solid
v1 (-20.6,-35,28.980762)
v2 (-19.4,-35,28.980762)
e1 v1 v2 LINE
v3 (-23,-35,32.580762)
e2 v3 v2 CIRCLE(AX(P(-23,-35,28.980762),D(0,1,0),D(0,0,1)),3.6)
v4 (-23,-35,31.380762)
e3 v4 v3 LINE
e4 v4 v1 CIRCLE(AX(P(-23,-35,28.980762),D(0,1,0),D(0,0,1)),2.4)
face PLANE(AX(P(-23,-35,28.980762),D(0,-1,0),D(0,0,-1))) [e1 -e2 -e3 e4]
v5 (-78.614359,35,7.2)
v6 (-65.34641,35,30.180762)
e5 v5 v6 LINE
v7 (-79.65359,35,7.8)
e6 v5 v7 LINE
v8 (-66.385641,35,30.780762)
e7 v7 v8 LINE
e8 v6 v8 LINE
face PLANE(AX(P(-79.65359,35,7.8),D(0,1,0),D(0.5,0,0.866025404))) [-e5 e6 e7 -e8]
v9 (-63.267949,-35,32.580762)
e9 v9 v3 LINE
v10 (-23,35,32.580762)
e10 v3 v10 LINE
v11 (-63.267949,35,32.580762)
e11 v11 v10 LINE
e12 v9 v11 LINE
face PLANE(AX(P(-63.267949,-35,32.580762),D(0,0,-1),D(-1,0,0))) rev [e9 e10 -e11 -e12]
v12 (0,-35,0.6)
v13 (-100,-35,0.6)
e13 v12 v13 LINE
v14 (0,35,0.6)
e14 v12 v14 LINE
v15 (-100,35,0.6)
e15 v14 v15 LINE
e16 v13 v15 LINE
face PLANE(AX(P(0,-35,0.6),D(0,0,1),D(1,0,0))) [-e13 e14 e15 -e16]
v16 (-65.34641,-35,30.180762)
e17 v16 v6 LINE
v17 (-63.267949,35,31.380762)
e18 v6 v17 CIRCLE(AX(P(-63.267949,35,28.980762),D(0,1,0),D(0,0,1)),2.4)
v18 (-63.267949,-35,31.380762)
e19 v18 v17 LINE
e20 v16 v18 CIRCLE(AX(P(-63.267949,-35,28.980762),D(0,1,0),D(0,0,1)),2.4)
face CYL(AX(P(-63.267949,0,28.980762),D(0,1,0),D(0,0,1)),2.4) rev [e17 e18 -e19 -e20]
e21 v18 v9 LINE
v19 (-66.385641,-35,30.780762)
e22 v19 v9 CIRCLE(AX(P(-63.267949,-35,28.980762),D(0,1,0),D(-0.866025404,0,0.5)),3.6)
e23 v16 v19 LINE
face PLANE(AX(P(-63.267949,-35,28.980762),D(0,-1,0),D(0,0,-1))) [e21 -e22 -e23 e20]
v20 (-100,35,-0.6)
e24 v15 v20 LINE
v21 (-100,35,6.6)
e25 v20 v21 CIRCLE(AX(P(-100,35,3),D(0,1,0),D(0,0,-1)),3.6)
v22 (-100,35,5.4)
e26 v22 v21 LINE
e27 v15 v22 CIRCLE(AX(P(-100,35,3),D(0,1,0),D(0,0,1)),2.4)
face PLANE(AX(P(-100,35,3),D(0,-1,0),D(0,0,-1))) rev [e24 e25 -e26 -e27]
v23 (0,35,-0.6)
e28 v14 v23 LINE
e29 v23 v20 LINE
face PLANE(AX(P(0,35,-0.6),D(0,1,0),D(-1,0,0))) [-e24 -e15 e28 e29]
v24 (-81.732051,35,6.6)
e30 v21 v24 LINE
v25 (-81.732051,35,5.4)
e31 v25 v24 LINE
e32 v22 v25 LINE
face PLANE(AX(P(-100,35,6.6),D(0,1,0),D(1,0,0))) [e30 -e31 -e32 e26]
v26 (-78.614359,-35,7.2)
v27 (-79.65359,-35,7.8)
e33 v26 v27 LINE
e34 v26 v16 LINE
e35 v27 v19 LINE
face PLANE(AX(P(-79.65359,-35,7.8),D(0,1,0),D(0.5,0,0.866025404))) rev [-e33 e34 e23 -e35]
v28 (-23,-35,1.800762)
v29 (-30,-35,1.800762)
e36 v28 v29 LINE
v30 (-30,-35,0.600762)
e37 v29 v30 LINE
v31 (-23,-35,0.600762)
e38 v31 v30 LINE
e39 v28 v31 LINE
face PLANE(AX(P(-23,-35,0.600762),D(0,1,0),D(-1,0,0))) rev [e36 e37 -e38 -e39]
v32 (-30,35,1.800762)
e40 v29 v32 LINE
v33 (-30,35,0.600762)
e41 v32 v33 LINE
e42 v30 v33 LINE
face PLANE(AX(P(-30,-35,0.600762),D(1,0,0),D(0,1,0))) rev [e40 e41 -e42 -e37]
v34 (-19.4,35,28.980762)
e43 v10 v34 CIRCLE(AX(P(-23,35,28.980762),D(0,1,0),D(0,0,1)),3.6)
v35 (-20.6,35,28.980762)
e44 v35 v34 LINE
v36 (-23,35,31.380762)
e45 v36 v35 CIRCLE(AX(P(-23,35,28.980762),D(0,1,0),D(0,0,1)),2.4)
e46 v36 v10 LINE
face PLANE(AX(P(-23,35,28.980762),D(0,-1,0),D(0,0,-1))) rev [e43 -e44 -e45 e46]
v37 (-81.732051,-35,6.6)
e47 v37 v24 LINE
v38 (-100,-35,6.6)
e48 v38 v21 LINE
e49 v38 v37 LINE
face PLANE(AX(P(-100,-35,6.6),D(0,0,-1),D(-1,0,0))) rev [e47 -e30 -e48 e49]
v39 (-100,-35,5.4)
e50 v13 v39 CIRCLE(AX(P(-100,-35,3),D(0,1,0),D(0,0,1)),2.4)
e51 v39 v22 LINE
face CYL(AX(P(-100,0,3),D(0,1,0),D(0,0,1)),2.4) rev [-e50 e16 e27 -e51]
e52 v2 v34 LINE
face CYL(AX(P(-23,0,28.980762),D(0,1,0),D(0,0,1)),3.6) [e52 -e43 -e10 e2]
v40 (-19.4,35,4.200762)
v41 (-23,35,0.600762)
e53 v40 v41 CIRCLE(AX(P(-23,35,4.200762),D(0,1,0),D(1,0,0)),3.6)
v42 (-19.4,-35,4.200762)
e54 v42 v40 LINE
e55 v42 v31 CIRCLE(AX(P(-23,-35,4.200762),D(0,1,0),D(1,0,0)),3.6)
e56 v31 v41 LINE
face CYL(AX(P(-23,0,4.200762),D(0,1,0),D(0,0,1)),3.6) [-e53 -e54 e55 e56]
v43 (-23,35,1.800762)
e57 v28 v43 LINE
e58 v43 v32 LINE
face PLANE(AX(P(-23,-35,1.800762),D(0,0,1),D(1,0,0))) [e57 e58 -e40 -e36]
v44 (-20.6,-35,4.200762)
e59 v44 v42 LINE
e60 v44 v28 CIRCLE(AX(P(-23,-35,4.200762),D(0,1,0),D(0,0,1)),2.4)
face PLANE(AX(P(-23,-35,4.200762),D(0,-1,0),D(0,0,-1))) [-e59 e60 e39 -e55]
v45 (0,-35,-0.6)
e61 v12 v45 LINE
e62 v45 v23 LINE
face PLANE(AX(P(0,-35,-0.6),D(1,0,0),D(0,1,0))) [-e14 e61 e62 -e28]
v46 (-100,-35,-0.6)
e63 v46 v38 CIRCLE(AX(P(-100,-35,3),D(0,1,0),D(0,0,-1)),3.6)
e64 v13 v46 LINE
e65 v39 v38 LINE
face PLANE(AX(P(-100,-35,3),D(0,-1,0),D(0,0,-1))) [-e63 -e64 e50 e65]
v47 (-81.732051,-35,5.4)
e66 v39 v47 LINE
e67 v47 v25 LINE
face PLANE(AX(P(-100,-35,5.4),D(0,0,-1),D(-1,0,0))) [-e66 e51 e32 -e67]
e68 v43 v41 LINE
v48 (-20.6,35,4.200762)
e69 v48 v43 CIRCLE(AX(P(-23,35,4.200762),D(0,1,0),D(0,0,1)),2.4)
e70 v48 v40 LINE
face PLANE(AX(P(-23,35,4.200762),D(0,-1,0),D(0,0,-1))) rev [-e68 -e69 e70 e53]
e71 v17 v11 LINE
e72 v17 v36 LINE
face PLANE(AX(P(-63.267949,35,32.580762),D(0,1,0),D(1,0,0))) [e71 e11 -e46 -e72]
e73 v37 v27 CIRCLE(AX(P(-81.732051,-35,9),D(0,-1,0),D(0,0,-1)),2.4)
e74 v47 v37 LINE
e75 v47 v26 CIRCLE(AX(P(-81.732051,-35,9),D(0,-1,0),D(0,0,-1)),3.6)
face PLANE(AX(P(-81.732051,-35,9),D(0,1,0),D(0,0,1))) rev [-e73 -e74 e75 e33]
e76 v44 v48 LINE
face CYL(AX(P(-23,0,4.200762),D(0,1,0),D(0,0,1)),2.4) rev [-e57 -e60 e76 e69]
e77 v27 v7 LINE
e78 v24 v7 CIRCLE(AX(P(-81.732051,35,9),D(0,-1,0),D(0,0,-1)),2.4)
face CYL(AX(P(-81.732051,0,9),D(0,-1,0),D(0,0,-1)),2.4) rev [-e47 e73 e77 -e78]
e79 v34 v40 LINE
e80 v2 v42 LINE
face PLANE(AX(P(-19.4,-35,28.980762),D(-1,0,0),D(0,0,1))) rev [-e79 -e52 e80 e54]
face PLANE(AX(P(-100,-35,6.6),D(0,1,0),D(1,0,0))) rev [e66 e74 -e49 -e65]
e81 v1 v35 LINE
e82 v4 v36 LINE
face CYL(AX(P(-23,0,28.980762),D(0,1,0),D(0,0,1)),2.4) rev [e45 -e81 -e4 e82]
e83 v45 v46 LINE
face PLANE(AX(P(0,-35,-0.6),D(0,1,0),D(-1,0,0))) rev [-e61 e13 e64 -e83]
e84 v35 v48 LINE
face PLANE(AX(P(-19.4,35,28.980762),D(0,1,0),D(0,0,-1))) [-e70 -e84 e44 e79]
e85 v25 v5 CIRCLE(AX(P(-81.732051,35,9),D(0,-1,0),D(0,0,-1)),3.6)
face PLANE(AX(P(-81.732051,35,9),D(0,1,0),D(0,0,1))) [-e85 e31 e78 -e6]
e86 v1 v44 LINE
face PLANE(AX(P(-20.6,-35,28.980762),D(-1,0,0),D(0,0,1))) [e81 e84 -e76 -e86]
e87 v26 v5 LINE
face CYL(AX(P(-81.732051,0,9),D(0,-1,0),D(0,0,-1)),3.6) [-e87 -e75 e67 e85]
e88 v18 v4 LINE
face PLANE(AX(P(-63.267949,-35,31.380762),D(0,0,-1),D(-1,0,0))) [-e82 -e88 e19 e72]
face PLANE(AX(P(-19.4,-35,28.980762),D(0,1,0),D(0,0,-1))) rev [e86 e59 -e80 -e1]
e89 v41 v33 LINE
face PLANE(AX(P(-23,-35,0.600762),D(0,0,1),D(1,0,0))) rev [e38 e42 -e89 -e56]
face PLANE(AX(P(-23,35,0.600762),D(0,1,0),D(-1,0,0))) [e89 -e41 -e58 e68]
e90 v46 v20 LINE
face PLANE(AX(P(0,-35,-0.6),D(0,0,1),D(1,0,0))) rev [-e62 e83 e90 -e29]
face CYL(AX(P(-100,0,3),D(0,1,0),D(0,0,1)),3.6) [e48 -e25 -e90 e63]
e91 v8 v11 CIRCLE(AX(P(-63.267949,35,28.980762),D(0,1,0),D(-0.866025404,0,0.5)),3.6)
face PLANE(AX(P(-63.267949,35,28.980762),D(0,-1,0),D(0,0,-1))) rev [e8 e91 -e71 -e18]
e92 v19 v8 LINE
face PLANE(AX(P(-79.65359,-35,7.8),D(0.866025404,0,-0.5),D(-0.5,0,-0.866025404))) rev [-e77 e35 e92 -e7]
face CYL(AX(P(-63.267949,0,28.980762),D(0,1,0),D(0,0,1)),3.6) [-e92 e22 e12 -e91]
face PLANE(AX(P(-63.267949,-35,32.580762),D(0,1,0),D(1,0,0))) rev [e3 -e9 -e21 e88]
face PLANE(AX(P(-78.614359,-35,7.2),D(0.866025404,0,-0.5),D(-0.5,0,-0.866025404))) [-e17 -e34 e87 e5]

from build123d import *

# Parameters (mm, degrees)
SKETCH2_W = 70
SKETCH2_H = 1.2


with BuildPart() as part:
    # Sweep1: sweep along a path in Sketch4
    with BuildLine(Plane(origin=(0, 0, 0), x_dir=(-1, 0, 0), z_dir=(0, 1, 0))) as sweep1_path:
        Line((0, 0), (100, 0))
        ThreePointArc((100, 0), (103, 3), (100, 6))
        Line((100, 6), (81.732050808, 6))
        ThreePointArc((81.732050808, 6), (80.232050808, 6.401923789), (79.133974596, 7.5))
        Line((79.133974596, 7.5), (65.866025404, 30.480762114))
        ThreePointArc((65.866025404, 30.480762114), (64.767949192, 31.578838325), (63.267949192, 31.980762114))
        Line((63.267949192, 31.980762114), (23, 31.980762114))
        ThreePointArc((23, 31.980762114), (20.878679656, 31.102082457), (20, 28.980762114))
        Line((20, 28.980762114), (20, 4.200762114))
        ThreePointArc((20, 4.200762114), (20.878679656, 2.07944177), (23, 1.200762114))
        Line((23, 1.200762114), (30, 1.200762114))
    # Sketch2 → Sweep1 (sweep)
    with BuildSketch(Plane.YZ):
        Rectangle(SKETCH2_W, SKETCH2_H)
    sweep(path=sweep1_path.line)


solid = part.part
